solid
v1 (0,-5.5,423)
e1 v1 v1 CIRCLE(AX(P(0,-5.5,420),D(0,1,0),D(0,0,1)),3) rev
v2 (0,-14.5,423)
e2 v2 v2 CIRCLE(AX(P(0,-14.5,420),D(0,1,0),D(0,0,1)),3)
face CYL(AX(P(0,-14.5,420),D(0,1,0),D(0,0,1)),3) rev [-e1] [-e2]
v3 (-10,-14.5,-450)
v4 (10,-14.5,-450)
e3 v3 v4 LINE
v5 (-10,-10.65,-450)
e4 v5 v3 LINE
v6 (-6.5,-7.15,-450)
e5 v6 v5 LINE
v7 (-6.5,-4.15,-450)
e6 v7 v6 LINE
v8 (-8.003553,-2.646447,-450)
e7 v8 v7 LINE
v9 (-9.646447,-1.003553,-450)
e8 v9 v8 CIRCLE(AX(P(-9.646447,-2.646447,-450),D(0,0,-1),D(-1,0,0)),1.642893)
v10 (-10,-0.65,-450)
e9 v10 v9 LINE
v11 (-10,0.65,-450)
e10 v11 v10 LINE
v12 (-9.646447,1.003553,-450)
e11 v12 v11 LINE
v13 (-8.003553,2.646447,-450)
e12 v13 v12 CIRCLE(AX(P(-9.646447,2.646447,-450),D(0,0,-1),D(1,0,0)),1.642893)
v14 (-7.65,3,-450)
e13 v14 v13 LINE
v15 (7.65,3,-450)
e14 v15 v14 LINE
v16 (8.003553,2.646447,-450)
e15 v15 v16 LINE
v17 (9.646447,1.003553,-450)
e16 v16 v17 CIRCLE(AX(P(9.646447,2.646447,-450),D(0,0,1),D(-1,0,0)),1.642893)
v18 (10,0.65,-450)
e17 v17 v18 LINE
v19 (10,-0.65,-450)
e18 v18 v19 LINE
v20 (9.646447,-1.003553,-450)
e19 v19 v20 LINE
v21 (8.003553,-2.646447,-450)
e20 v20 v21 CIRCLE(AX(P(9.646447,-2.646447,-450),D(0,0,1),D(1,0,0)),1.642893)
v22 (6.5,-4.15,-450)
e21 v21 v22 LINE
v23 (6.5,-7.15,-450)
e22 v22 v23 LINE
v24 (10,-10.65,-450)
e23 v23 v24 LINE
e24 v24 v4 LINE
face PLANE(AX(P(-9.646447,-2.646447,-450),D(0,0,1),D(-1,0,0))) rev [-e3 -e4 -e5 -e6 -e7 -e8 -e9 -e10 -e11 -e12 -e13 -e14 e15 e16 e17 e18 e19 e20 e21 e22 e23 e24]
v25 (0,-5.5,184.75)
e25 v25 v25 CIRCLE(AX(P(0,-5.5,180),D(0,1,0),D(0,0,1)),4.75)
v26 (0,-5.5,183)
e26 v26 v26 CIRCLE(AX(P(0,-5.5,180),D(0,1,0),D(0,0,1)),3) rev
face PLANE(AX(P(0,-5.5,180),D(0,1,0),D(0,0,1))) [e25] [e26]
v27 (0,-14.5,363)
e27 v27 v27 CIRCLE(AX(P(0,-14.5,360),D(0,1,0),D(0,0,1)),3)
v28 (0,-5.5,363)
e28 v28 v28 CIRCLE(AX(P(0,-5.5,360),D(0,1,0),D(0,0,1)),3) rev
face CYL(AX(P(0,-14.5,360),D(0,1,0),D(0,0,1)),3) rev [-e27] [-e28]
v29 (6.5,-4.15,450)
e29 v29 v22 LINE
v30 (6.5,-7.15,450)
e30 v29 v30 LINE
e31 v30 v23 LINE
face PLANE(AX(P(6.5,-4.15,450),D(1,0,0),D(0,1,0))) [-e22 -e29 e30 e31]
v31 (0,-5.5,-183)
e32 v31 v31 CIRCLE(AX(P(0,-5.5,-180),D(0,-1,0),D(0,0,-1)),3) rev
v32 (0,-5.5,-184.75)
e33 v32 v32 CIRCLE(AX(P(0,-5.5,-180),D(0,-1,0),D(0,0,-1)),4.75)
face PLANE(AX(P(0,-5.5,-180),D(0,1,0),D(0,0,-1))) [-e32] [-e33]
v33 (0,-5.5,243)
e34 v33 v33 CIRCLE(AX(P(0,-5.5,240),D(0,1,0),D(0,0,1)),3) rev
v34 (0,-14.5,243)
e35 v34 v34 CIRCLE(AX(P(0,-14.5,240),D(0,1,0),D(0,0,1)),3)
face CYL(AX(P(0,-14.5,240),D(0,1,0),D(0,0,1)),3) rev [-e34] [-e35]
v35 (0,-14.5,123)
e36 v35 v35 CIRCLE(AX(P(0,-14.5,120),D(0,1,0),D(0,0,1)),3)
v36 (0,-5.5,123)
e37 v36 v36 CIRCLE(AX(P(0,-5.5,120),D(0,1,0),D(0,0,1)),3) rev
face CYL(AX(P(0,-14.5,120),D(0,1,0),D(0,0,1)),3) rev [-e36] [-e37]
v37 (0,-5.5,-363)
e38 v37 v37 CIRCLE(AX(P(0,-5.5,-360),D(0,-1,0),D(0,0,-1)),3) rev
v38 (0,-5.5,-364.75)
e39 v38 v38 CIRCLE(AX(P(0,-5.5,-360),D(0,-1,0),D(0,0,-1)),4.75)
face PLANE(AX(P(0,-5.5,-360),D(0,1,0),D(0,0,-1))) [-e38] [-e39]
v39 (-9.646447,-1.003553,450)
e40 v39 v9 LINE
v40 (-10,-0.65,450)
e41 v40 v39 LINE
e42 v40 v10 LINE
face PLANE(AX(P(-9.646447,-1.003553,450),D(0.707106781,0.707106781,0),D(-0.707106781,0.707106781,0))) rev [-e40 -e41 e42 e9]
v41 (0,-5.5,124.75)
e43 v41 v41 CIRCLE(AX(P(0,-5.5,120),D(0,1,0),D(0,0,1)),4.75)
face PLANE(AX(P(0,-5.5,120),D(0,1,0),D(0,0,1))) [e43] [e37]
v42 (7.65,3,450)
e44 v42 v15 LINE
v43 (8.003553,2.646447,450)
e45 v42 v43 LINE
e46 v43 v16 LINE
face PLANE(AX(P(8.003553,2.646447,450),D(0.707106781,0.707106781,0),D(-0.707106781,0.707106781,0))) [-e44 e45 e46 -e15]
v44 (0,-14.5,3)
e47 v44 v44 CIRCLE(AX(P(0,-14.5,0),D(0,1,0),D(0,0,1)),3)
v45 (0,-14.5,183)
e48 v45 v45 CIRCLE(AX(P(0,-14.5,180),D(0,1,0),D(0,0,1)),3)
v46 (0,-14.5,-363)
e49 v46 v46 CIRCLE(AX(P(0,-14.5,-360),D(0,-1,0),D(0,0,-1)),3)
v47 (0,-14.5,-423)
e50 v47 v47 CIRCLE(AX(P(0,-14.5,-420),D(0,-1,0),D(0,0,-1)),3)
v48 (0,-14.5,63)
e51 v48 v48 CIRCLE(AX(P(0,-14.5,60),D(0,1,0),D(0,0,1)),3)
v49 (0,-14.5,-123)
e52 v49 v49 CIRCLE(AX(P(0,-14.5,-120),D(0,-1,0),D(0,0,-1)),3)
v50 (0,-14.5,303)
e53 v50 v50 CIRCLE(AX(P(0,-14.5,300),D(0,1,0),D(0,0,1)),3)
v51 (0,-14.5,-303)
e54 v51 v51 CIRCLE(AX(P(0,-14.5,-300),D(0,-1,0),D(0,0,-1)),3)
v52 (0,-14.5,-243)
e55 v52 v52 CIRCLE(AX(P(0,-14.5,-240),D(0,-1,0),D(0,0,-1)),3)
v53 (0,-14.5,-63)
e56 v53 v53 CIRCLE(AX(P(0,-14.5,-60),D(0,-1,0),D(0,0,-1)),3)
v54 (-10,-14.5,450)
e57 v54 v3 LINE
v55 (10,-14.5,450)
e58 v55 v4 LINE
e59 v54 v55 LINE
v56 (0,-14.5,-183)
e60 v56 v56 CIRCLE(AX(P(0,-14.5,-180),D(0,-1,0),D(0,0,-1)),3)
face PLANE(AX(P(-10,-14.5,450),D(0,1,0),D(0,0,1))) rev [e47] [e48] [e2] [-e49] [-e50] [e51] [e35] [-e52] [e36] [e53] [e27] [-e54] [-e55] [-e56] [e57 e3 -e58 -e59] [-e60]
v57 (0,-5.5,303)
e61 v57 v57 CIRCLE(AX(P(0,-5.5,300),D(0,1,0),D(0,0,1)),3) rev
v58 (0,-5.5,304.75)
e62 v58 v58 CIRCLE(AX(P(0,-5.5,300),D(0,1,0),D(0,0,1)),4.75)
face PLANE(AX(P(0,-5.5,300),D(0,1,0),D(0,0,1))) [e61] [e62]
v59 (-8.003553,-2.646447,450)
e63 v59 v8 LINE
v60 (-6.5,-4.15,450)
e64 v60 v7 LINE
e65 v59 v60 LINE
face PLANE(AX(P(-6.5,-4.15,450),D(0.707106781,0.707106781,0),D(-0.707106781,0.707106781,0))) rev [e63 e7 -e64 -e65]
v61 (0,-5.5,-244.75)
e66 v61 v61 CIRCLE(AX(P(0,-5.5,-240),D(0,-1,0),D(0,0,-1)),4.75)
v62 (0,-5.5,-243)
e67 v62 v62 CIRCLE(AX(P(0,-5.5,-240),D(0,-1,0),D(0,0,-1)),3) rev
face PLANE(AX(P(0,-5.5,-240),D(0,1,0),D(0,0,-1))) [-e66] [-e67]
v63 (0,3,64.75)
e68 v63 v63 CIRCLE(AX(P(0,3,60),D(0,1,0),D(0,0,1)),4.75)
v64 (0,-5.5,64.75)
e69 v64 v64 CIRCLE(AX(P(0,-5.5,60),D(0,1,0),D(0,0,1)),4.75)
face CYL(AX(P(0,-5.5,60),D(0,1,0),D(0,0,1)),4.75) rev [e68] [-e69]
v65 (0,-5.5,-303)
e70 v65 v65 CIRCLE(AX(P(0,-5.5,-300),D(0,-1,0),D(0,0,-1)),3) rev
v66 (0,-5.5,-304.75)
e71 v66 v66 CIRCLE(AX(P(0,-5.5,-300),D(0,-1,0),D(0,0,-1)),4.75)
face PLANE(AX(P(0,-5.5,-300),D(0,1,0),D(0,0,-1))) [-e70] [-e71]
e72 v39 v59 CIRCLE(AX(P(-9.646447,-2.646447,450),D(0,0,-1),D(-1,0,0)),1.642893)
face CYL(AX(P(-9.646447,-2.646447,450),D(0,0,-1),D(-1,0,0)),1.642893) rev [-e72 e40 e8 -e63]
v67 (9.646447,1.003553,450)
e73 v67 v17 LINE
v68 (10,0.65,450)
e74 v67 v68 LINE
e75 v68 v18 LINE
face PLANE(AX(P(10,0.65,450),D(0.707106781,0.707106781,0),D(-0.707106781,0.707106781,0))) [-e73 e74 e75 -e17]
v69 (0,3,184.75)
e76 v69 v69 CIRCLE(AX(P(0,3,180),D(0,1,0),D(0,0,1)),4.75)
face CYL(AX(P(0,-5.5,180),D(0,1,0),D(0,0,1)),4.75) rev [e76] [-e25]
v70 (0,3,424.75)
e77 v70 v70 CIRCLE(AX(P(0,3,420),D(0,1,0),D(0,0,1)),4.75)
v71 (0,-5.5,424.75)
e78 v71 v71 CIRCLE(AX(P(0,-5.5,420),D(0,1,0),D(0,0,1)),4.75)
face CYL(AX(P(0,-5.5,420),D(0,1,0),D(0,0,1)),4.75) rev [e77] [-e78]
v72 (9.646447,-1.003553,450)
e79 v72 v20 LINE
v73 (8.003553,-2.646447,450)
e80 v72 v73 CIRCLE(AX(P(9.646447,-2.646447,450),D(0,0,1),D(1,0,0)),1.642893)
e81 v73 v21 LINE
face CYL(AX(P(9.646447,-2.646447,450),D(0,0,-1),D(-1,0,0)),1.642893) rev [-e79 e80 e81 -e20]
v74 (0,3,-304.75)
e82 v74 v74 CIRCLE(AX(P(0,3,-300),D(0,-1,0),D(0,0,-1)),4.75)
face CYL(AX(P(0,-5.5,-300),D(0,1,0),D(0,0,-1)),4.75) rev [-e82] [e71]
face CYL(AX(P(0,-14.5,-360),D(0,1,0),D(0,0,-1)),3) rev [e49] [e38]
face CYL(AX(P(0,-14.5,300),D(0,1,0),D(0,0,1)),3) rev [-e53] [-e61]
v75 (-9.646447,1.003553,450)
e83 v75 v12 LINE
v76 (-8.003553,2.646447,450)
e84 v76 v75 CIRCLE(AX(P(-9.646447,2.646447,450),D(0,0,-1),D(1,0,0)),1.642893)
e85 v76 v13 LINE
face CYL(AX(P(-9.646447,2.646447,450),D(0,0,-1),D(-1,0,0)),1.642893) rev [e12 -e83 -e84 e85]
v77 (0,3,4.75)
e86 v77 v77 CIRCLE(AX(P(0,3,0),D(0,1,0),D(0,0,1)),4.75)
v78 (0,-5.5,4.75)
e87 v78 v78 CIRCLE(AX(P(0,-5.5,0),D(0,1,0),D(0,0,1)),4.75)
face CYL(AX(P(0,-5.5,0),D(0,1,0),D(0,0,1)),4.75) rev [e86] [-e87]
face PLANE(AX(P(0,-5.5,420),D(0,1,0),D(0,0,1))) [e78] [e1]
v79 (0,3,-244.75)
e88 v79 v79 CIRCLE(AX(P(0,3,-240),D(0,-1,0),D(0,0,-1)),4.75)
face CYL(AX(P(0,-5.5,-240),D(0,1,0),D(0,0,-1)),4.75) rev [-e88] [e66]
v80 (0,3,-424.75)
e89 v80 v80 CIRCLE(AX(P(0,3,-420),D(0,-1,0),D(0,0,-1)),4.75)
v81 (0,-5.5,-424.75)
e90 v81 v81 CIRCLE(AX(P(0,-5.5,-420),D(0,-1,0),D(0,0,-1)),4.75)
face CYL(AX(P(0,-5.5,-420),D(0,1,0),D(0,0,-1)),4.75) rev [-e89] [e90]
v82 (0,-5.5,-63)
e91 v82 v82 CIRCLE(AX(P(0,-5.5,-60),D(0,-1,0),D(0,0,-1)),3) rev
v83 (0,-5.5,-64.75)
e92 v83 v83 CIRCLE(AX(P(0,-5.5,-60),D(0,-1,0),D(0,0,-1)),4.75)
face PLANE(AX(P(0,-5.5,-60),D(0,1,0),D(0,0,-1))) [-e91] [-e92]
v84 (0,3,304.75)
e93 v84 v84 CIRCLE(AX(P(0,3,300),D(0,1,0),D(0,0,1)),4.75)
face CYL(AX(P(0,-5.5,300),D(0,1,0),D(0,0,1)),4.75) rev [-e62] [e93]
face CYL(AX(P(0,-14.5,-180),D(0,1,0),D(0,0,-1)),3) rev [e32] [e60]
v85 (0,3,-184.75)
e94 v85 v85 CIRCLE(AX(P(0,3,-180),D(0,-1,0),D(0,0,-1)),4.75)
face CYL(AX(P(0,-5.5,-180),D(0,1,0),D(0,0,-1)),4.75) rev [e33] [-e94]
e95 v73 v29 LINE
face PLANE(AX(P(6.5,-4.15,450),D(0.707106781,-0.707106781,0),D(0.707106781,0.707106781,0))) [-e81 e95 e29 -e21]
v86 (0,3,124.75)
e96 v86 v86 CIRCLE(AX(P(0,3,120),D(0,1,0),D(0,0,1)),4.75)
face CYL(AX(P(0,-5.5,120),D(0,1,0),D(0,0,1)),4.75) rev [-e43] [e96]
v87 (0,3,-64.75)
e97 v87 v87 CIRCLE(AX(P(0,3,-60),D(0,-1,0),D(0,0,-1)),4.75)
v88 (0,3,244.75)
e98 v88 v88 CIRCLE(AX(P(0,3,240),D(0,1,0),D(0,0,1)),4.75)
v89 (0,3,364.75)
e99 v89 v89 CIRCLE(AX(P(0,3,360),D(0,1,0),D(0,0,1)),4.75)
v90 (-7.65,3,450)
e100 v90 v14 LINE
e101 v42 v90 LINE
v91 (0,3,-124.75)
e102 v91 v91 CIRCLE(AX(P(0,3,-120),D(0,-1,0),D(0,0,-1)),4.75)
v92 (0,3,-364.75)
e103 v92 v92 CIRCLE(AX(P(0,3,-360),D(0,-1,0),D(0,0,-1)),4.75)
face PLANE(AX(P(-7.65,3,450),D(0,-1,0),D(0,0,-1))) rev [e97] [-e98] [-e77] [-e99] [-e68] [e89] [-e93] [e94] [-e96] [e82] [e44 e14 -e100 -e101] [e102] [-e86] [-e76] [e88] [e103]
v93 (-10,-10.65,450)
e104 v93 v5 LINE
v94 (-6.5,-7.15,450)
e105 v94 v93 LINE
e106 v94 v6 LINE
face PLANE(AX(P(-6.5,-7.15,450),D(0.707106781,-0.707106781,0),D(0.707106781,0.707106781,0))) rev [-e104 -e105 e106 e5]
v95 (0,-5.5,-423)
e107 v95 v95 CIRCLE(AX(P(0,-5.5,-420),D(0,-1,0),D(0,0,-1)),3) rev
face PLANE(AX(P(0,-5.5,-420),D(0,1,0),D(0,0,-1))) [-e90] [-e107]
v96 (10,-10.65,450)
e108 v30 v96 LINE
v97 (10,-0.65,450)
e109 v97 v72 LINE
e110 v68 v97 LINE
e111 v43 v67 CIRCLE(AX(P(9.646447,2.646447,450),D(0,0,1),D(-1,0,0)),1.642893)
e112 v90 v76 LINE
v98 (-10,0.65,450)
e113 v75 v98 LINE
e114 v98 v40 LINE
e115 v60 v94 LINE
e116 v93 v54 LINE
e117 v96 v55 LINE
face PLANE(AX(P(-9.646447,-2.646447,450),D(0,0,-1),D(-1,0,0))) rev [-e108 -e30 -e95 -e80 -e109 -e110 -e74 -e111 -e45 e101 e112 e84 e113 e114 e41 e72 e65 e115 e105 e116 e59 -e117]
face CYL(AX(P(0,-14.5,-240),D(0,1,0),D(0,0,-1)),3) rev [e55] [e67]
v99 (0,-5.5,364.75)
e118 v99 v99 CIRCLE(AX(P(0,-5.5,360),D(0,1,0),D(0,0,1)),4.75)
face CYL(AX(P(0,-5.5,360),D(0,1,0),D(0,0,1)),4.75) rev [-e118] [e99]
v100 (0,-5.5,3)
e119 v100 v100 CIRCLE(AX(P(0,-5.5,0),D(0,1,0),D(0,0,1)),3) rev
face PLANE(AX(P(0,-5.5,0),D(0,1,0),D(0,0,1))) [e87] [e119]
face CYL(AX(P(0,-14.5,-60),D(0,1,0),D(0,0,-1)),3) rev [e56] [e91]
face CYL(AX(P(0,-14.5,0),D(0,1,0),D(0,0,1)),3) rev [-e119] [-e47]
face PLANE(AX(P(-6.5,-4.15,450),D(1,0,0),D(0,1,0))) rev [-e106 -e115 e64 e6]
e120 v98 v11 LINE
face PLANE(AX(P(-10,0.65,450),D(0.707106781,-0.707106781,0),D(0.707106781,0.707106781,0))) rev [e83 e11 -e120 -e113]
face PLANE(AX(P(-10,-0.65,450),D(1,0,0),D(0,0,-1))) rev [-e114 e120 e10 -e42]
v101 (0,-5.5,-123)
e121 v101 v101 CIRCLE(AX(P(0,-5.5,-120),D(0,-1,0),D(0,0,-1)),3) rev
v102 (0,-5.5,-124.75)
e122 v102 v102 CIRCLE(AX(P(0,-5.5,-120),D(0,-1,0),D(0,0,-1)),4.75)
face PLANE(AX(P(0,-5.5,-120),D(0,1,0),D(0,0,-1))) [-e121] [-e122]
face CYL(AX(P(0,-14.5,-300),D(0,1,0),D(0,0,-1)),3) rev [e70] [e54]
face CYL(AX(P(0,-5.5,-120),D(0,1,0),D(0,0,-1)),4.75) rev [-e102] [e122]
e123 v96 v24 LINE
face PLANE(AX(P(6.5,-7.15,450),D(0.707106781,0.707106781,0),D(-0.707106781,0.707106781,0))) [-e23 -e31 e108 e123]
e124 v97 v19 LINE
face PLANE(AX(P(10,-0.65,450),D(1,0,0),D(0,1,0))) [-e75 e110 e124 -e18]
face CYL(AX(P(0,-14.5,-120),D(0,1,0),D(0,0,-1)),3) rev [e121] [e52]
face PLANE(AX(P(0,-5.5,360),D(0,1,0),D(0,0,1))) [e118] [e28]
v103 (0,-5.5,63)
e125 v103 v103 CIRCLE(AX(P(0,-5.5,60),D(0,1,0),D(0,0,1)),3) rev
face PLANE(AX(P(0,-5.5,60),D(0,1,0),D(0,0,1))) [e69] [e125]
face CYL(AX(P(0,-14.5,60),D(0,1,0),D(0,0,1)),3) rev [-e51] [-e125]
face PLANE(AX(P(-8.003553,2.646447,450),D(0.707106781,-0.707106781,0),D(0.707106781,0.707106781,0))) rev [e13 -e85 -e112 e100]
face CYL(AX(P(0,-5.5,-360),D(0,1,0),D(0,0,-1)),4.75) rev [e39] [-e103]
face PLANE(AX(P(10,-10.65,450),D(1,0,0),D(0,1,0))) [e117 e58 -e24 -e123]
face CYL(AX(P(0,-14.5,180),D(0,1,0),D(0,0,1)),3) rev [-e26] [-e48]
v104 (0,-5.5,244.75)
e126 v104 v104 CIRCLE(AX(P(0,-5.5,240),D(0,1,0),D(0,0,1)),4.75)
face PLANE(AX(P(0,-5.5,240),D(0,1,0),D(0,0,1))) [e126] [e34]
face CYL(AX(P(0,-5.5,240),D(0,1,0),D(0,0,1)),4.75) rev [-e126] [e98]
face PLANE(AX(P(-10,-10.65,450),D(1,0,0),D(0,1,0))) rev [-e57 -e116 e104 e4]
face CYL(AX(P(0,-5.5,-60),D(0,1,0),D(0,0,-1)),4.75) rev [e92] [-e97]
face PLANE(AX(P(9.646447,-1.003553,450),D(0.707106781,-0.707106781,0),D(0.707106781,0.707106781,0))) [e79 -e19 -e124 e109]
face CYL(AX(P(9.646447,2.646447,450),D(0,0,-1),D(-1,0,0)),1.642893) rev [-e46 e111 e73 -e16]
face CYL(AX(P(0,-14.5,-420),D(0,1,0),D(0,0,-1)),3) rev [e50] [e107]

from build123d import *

# Parameters (mm, degrees)
BOSS_EXTRUDE1_DEPTH   = 450
SKETCH2_R             = 3
CUT_EXTRUDE1_DEPTH    = 451.451162725
SKETCH3_R             = 4.75
CUT_EXTRUDE2_DEPTH    = 8.5
LPATTERN1_COUNT       = 100
LPATTERN1_PITCH       = 60
MIRROR2_START         = -14.5
MIRROR2_OUTLINE_R     = 4.75
MIRROR2_DEPTH         = 17.5
MIRROR2_2_OUTLINE_W   = 3.5
MIRROR2_2_OUTLINE_H   = 450
MIRROR2_2_OUTLINE_R   = 4.75
MIRROR2_2_OUTLINE_R_2 = 3
MIRROR2_2_DEPTH       = 3.85
MIRROR2_START_2       = -0.65
MIRROR2_3_OUTLINE_W   = 3.5
MIRROR2_3_OUTLINE_H   = 450
MIRROR2_3_DEPTH       = 1.3
MIRROR2_START_3       = -11.024451
MIRROR2_4_OUTLINE_R   = 4.75
MIRROR2_4_OUTLINE_R_2 = 3
MIRROR2_4_DEPTH       = 5.524451
MIRROR2_START_4       = -450
MIRROR2_5_DEPTH       = 450


with BuildPart() as part:
    # Sketch1 → Boss-Extrude1 (new body)
    with BuildSketch(Plane.XY):
        with BuildLine():
            Line((-6.5, -4.15), (-6.5, -7.15))
            Line((-6.5, -7.15), (-10, -10.65))
            Line((-10, -10.65), (-10, -14.5))
            Line((-10, -14.5), (0, -14.5))
            Line((0, -14.5), (0, 3))
            Line((0, 3), (-7.65, 3))
            Line((-7.65, 3), (-8.003553391, 2.646446609))
            ThreePointArc((-8.003553391, 2.646446609), (-8.484745674, 1.484745674), (-9.646446609, 1.003553391))
            Line((-9.646446609, 1.003553391), (-10, 0.65))
            Line((-10, 0.65), (-10, -0.65))
            Line((-10, -0.65), (-9.646446609, -1.003553391))
            ThreePointArc((-9.646446609, -1.003553391), (-8.484745674, -1.484745674), (-8.003553391, -2.646446609))
            Line((-8.003553391, -2.646446609), (-6.5, -4.15))
        make_face()
    boss_extrude1 = extrude(amount=BOSS_EXTRUDE1_DEPTH)

    # Mirror1: Boss-Extrude1 across plane
    add(boss_extrude1.mirror(Plane(origin=(0, 3, 450), x_dir=(0, 0, 1), z_dir=(-1, 0, 0))))

    # Sketch2 → Cut-Extrude1 (cut, through all)
    with BuildSketch(Plane(origin=(0, 3, 0), x_dir=(1, 0, 0), z_dir=(0, 1, 0))):
        Circle(SKETCH2_R)
    cut_extrude1 = extrude(amount=-CUT_EXTRUDE1_DEPTH, mode=Mode.SUBTRACT)

    # Sketch3 → Cut-Extrude2 (cut)
    with BuildSketch(Plane(origin=(0, 3, 0), x_dir=(1, 0, 0), z_dir=(0, 1, 0))):
        Circle(SKETCH3_R)
    cut_extrude2 = extrude(amount=-CUT_EXTRUDE2_DEPTH, mode=Mode.SUBTRACT)

    # LPattern1: Cut-Extrude1, Cut-Extrude2 ×100
    with Locations(*[(0, 0, i * LPATTERN1_PITCH) for i in range(1, LPATTERN1_COUNT)]):
        add(cut_extrude1, mode=Mode.SUBTRACT)
        add(cut_extrude2, mode=Mode.SUBTRACT)

    # Mirror2: read off the stored shape, not the designer's step
    # Mirror2 outline → Mirror2 (add)
    with BuildSketch(Plane(origin=(0, 0, 0), x_dir=(1, 0, 0), z_dir=(0, 1, 0)).offset(MIRROR2_START)):
        with BuildLine():
            ThreePointArc((-4.75, 0), (0, 4.75), (4.75, 0))
            Line((4.75, 0), (6.5, 0))
            Line((6.5, 0), (6.5, 450))
            Line((6.5, 450), (-6.5, 450))
            Line((-6.5, 450), (-6.5, 0))
            Line((-6.5, 0), (-4.75, 0))
        make_face()
        with Locations((0, 60)):
            Circle(MIRROR2_OUTLINE_R, mode=Mode.SUBTRACT)
        with Locations((0, 120)):
            Circle(MIRROR2_OUTLINE_R, mode=Mode.SUBTRACT)
        with Locations((0, 180)):
            Circle(MIRROR2_OUTLINE_R, mode=Mode.SUBTRACT)
        with Locations((0, 240)):
            Circle(MIRROR2_OUTLINE_R, mode=Mode.SUBTRACT)
        with Locations((0, 300)):
            Circle(MIRROR2_OUTLINE_R, mode=Mode.SUBTRACT)
        with Locations((0, 360)):
            Circle(MIRROR2_OUTLINE_R, mode=Mode.SUBTRACT)
        with Locations((0, 420)):
            Circle(MIRROR2_OUTLINE_R, mode=Mode.SUBTRACT)
    extrude(amount=MIRROR2_DEPTH)

    # Mirror2 2 outline → Mirror2 2 (add)
    # profile 1 of 10: a face of its own
    with BuildSketch(Plane(origin=(0, 0, 0), x_dir=(1, 0, 0), z_dir=(0, 1, 0)).offset(MIRROR2_START)):
        with BuildLine():
            ThreePointArc((-3, 0), (0, 3), (3, 0))
            Line((3, 0), (4.75, 0))
            ThreePointArc((4.75, 0), (0, 4.75), (-4.75, 0))
            Line((-4.75, 0), (-3, 0))
        make_face()
    # profile 2 of 10: a face of its own
    with BuildSketch(Plane(origin=(0, 0, 0), x_dir=(1, 0, 0), z_dir=(0, 1, 0)).offset(MIRROR2_START)):
        with Locations((8.25, 225)):
            Rectangle(MIRROR2_2_OUTLINE_W, MIRROR2_2_OUTLINE_H)
    # profile 3 of 10: a face of its own
    with BuildSketch(Plane(origin=(0, 0, 0), x_dir=(1, 0, 0), z_dir=(0, 1, 0)).offset(MIRROR2_START)):
        with Locations((-8.25, 225)):
            Rectangle(MIRROR2_2_OUTLINE_W, MIRROR2_2_OUTLINE_H)
    # profile 4 of 10: a face of its own
    with BuildSketch(Plane(origin=(0, 0, 0), x_dir=(1, 0, 0), z_dir=(0, 1, 0)).offset(MIRROR2_START)):
        with Locations((0, 60)):
            Circle(MIRROR2_2_OUTLINE_R)
        with Locations((0, 60)):
            Circle(MIRROR2_2_OUTLINE_R_2, mode=Mode.SUBTRACT)
    # profile 5 of 10: a face of its own
    with BuildSketch(Plane(origin=(0, 0, 0), x_dir=(1, 0, 0), z_dir=(0, 1, 0)).offset(MIRROR2_START)):
        with Locations((0, 120)):
            Circle(MIRROR2_2_OUTLINE_R)
        with Locations((0, 120)):
            Circle(MIRROR2_2_OUTLINE_R_2, mode=Mode.SUBTRACT)
    # profile 6 of 10: a face of its own
    with BuildSketch(Plane(origin=(0, 0, 0), x_dir=(1, 0, 0), z_dir=(0, 1, 0)).offset(MIRROR2_START)):
        with Locations((0, 180)):
            Circle(MIRROR2_2_OUTLINE_R)
        with Locations((0, 180)):
            Circle(MIRROR2_2_OUTLINE_R_2, mode=Mode.SUBTRACT)
    # profile 7 of 10: a face of its own
    with BuildSketch(Plane(origin=(0, 0, 0), x_dir=(1, 0, 0), z_dir=(0, 1, 0)).offset(MIRROR2_START)):
        with Locations((0, 240)):
            Circle(MIRROR2_2_OUTLINE_R)
        with Locations((0, 240)):
            Circle(MIRROR2_2_OUTLINE_R_2, mode=Mode.SUBTRACT)
    # profile 8 of 10: a face of its own
    with BuildSketch(Plane(origin=(0, 0, 0), x_dir=(1, 0, 0), z_dir=(0, 1, 0)).offset(MIRROR2_START)):
        with Locations((0, 300)):
            Circle(MIRROR2_2_OUTLINE_R)
        with Locations((0, 300)):
            Circle(MIRROR2_2_OUTLINE_R_2, mode=Mode.SUBTRACT)
    # profile 9 of 10: a face of its own
    with BuildSketch(Plane(origin=(0, 0, 0), x_dir=(1, 0, 0), z_dir=(0, 1, 0)).offset(MIRROR2_START)):
        with Locations((0, 360)):
            Circle(MIRROR2_2_OUTLINE_R)
        with Locations((0, 360)):
            Circle(MIRROR2_2_OUTLINE_R_2, mode=Mode.SUBTRACT)
    # profile 10 of 10: a face of its own
    with BuildSketch(Plane(origin=(0, 0, 0), x_dir=(1, 0, 0), z_dir=(0, 1, 0)).offset(MIRROR2_START)):
        with Locations((0, 420)):
            Circle(MIRROR2_2_OUTLINE_R)
        with Locations((0, 420)):
            Circle(MIRROR2_2_OUTLINE_R_2, mode=Mode.SUBTRACT)
    extrude(amount=MIRROR2_2_DEPTH)

    # Mirror2 3 outline → Mirror2 3 (add)
    with BuildSketch(Plane(origin=(0, 0, 0), x_dir=(1, 0, 0), z_dir=(0, 1, 0)).offset(MIRROR2_START_2)):
        with Locations((8.25, 225)):
            Rectangle(MIRROR2_3_OUTLINE_W, MIRROR2_3_OUTLINE_H)
        with Locations((-8.25, 225)):
            Rectangle(MIRROR2_3_OUTLINE_W, MIRROR2_3_OUTLINE_H)
    extrude(amount=MIRROR2_3_DEPTH)

    # Mirror2 4 outline → Mirror2 4 (add)
    # profile 1 of 8: a face of its own
    with BuildSketch(Plane(origin=(0, 0, 0), x_dir=(1, 0, 0), z_dir=(0, 1, 0)).offset(MIRROR2_START_3)):
        with BuildLine():
            ThreePointArc((-3, 0), (0, 3), (3, 0))
            Line((3, 0), (4.75, 0))
            ThreePointArc((4.75, 0), (0, 4.75), (-4.75, 0))
            Line((-4.75, 0), (-3, 0))
        make_face()
    # profile 2 of 8: a face of its own
    with BuildSketch(Plane(origin=(0, 0, 0), x_dir=(1, 0, 0), z_dir=(0, 1, 0)).offset(MIRROR2_START_3)):
        with Locations((0, 60)):
            Circle(MIRROR2_4_OUTLINE_R)
        with Locations((0, 60)):
            Circle(MIRROR2_4_OUTLINE_R_2, mode=Mode.SUBTRACT)
    # profile 3 of 8: a face of its own
    with BuildSketch(Plane(origin=(0, 0, 0), x_dir=(1, 0, 0), z_dir=(0, 1, 0)).offset(MIRROR2_START_3)):
        with Locations((0, 120)):
            Circle(MIRROR2_4_OUTLINE_R)
        with Locations((0, 120)):
            Circle(MIRROR2_4_OUTLINE_R_2, mode=Mode.SUBTRACT)
    # profile 4 of 8: a face of its own
    with BuildSketch(Plane(origin=(0, 0, 0), x_dir=(1, 0, 0), z_dir=(0, 1, 0)).offset(MIRROR2_START_3)):
        with Locations((0, 180)):
            Circle(MIRROR2_4_OUTLINE_R)
        with Locations((0, 180)):
            Circle(MIRROR2_4_OUTLINE_R_2, mode=Mode.SUBTRACT)
    # profile 5 of 8: a face of its own
    with BuildSketch(Plane(origin=(0, 0, 0), x_dir=(1, 0, 0), z_dir=(0, 1, 0)).offset(MIRROR2_START_3)):
        with Locations((0, 240)):
            Circle(MIRROR2_4_OUTLINE_R)
        with Locations((0, 240)):
            Circle(MIRROR2_4_OUTLINE_R_2, mode=Mode.SUBTRACT)
    # profile 6 of 8: a face of its own
    with BuildSketch(Plane(origin=(0, 0, 0), x_dir=(1, 0, 0), z_dir=(0, 1, 0)).offset(MIRROR2_START_3)):
        with Locations((0, 300)):
            Circle(MIRROR2_4_OUTLINE_R)
        with Locations((0, 300)):
            Circle(MIRROR2_4_OUTLINE_R_2, mode=Mode.SUBTRACT)
    # profile 7 of 8: a face of its own
    with BuildSketch(Plane(origin=(0, 0, 0), x_dir=(1, 0, 0), z_dir=(0, 1, 0)).offset(MIRROR2_START_3)):
        with Locations((0, 360)):
            Circle(MIRROR2_4_OUTLINE_R)
        with Locations((0, 360)):
            Circle(MIRROR2_4_OUTLINE_R_2, mode=Mode.SUBTRACT)
    # profile 8 of 8: a face of its own
    with BuildSketch(Plane(origin=(0, 0, 0), x_dir=(1, 0, 0), z_dir=(0, 1, 0)).offset(MIRROR2_START_3)):
        with Locations((0, 420)):
            Circle(MIRROR2_4_OUTLINE_R)
        with Locations((0, 420)):
            Circle(MIRROR2_4_OUTLINE_R_2, mode=Mode.SUBTRACT)
    extrude(amount=MIRROR2_4_DEPTH)

    # Mirror2 5 outline → Mirror2 5 (add)
    with BuildSketch(Plane.XY.offset(MIRROR2_START_4)):
        Polygon((-6.5, -10.65), (-6.5, -7.15), (-10, -10.65), align=None)
        with BuildLine():
            Line((-8.003553391, -2.646446609), (-6.5, -4.15))
            Line((-6.5, -4.15), (-6.5, -0.65))
            Line((-6.5, -0.65), (-10, -0.65))
            Line((-10, -0.65), (-9.646446609, -1.003553391))
            ThreePointArc((-9.646446609, -1.003553391), (-8.484745674, -1.484745674), (-8.003553391, -2.646446609))
        make_face()
        with BuildLine():
            Line((7.65, 3), (6.5, 3))
            Line((6.5, 3), (6.5, 0.65))
            Line((6.5, 0.65), (10, 0.65))
            Line((10, 0.65), (9.646446609, 1.003553391))
            ThreePointArc((9.646446609, 1.003553391), (8.484745674, 1.484745674), (8.003553391, 2.646446609))
            Line((8.003553391, 2.646446609), (7.65, 3))
        make_face()
        with BuildLine():
            Line((-6.5, 3), (-7.65, 3))
            Line((-7.65, 3), (-8.003553391, 2.646446609))
            ThreePointArc((-8.003553391, 2.646446609), (-8.484745674, 1.484745674), (-9.646446609, 1.003553391))
            Line((-9.646446609, 1.003553391), (-10, 0.65))
            Line((-10, 0.65), (-6.5, 0.65))
            Line((-6.5, 0.65), (-6.5, 3))
        make_face()
        with BuildLine():
            Line((6.5, -0.65), (6.5, -4.15))
            Line((6.5, -4.15), (8.003553391, -2.646446609))
            ThreePointArc((8.003553391, -2.646446609), (8.484745674, -1.484745674), (9.646446609, -1.003553391))
            Line((9.646446609, -1.003553391), (10, -0.65))
            Line((10, -0.65), (6.5, -0.65))
        make_face()
        Polygon((10, -10.65), (6.5, -7.15), (6.5, -10.65), align=None)
    extrude(amount=MIRROR2_5_DEPTH)


solid = part.part
